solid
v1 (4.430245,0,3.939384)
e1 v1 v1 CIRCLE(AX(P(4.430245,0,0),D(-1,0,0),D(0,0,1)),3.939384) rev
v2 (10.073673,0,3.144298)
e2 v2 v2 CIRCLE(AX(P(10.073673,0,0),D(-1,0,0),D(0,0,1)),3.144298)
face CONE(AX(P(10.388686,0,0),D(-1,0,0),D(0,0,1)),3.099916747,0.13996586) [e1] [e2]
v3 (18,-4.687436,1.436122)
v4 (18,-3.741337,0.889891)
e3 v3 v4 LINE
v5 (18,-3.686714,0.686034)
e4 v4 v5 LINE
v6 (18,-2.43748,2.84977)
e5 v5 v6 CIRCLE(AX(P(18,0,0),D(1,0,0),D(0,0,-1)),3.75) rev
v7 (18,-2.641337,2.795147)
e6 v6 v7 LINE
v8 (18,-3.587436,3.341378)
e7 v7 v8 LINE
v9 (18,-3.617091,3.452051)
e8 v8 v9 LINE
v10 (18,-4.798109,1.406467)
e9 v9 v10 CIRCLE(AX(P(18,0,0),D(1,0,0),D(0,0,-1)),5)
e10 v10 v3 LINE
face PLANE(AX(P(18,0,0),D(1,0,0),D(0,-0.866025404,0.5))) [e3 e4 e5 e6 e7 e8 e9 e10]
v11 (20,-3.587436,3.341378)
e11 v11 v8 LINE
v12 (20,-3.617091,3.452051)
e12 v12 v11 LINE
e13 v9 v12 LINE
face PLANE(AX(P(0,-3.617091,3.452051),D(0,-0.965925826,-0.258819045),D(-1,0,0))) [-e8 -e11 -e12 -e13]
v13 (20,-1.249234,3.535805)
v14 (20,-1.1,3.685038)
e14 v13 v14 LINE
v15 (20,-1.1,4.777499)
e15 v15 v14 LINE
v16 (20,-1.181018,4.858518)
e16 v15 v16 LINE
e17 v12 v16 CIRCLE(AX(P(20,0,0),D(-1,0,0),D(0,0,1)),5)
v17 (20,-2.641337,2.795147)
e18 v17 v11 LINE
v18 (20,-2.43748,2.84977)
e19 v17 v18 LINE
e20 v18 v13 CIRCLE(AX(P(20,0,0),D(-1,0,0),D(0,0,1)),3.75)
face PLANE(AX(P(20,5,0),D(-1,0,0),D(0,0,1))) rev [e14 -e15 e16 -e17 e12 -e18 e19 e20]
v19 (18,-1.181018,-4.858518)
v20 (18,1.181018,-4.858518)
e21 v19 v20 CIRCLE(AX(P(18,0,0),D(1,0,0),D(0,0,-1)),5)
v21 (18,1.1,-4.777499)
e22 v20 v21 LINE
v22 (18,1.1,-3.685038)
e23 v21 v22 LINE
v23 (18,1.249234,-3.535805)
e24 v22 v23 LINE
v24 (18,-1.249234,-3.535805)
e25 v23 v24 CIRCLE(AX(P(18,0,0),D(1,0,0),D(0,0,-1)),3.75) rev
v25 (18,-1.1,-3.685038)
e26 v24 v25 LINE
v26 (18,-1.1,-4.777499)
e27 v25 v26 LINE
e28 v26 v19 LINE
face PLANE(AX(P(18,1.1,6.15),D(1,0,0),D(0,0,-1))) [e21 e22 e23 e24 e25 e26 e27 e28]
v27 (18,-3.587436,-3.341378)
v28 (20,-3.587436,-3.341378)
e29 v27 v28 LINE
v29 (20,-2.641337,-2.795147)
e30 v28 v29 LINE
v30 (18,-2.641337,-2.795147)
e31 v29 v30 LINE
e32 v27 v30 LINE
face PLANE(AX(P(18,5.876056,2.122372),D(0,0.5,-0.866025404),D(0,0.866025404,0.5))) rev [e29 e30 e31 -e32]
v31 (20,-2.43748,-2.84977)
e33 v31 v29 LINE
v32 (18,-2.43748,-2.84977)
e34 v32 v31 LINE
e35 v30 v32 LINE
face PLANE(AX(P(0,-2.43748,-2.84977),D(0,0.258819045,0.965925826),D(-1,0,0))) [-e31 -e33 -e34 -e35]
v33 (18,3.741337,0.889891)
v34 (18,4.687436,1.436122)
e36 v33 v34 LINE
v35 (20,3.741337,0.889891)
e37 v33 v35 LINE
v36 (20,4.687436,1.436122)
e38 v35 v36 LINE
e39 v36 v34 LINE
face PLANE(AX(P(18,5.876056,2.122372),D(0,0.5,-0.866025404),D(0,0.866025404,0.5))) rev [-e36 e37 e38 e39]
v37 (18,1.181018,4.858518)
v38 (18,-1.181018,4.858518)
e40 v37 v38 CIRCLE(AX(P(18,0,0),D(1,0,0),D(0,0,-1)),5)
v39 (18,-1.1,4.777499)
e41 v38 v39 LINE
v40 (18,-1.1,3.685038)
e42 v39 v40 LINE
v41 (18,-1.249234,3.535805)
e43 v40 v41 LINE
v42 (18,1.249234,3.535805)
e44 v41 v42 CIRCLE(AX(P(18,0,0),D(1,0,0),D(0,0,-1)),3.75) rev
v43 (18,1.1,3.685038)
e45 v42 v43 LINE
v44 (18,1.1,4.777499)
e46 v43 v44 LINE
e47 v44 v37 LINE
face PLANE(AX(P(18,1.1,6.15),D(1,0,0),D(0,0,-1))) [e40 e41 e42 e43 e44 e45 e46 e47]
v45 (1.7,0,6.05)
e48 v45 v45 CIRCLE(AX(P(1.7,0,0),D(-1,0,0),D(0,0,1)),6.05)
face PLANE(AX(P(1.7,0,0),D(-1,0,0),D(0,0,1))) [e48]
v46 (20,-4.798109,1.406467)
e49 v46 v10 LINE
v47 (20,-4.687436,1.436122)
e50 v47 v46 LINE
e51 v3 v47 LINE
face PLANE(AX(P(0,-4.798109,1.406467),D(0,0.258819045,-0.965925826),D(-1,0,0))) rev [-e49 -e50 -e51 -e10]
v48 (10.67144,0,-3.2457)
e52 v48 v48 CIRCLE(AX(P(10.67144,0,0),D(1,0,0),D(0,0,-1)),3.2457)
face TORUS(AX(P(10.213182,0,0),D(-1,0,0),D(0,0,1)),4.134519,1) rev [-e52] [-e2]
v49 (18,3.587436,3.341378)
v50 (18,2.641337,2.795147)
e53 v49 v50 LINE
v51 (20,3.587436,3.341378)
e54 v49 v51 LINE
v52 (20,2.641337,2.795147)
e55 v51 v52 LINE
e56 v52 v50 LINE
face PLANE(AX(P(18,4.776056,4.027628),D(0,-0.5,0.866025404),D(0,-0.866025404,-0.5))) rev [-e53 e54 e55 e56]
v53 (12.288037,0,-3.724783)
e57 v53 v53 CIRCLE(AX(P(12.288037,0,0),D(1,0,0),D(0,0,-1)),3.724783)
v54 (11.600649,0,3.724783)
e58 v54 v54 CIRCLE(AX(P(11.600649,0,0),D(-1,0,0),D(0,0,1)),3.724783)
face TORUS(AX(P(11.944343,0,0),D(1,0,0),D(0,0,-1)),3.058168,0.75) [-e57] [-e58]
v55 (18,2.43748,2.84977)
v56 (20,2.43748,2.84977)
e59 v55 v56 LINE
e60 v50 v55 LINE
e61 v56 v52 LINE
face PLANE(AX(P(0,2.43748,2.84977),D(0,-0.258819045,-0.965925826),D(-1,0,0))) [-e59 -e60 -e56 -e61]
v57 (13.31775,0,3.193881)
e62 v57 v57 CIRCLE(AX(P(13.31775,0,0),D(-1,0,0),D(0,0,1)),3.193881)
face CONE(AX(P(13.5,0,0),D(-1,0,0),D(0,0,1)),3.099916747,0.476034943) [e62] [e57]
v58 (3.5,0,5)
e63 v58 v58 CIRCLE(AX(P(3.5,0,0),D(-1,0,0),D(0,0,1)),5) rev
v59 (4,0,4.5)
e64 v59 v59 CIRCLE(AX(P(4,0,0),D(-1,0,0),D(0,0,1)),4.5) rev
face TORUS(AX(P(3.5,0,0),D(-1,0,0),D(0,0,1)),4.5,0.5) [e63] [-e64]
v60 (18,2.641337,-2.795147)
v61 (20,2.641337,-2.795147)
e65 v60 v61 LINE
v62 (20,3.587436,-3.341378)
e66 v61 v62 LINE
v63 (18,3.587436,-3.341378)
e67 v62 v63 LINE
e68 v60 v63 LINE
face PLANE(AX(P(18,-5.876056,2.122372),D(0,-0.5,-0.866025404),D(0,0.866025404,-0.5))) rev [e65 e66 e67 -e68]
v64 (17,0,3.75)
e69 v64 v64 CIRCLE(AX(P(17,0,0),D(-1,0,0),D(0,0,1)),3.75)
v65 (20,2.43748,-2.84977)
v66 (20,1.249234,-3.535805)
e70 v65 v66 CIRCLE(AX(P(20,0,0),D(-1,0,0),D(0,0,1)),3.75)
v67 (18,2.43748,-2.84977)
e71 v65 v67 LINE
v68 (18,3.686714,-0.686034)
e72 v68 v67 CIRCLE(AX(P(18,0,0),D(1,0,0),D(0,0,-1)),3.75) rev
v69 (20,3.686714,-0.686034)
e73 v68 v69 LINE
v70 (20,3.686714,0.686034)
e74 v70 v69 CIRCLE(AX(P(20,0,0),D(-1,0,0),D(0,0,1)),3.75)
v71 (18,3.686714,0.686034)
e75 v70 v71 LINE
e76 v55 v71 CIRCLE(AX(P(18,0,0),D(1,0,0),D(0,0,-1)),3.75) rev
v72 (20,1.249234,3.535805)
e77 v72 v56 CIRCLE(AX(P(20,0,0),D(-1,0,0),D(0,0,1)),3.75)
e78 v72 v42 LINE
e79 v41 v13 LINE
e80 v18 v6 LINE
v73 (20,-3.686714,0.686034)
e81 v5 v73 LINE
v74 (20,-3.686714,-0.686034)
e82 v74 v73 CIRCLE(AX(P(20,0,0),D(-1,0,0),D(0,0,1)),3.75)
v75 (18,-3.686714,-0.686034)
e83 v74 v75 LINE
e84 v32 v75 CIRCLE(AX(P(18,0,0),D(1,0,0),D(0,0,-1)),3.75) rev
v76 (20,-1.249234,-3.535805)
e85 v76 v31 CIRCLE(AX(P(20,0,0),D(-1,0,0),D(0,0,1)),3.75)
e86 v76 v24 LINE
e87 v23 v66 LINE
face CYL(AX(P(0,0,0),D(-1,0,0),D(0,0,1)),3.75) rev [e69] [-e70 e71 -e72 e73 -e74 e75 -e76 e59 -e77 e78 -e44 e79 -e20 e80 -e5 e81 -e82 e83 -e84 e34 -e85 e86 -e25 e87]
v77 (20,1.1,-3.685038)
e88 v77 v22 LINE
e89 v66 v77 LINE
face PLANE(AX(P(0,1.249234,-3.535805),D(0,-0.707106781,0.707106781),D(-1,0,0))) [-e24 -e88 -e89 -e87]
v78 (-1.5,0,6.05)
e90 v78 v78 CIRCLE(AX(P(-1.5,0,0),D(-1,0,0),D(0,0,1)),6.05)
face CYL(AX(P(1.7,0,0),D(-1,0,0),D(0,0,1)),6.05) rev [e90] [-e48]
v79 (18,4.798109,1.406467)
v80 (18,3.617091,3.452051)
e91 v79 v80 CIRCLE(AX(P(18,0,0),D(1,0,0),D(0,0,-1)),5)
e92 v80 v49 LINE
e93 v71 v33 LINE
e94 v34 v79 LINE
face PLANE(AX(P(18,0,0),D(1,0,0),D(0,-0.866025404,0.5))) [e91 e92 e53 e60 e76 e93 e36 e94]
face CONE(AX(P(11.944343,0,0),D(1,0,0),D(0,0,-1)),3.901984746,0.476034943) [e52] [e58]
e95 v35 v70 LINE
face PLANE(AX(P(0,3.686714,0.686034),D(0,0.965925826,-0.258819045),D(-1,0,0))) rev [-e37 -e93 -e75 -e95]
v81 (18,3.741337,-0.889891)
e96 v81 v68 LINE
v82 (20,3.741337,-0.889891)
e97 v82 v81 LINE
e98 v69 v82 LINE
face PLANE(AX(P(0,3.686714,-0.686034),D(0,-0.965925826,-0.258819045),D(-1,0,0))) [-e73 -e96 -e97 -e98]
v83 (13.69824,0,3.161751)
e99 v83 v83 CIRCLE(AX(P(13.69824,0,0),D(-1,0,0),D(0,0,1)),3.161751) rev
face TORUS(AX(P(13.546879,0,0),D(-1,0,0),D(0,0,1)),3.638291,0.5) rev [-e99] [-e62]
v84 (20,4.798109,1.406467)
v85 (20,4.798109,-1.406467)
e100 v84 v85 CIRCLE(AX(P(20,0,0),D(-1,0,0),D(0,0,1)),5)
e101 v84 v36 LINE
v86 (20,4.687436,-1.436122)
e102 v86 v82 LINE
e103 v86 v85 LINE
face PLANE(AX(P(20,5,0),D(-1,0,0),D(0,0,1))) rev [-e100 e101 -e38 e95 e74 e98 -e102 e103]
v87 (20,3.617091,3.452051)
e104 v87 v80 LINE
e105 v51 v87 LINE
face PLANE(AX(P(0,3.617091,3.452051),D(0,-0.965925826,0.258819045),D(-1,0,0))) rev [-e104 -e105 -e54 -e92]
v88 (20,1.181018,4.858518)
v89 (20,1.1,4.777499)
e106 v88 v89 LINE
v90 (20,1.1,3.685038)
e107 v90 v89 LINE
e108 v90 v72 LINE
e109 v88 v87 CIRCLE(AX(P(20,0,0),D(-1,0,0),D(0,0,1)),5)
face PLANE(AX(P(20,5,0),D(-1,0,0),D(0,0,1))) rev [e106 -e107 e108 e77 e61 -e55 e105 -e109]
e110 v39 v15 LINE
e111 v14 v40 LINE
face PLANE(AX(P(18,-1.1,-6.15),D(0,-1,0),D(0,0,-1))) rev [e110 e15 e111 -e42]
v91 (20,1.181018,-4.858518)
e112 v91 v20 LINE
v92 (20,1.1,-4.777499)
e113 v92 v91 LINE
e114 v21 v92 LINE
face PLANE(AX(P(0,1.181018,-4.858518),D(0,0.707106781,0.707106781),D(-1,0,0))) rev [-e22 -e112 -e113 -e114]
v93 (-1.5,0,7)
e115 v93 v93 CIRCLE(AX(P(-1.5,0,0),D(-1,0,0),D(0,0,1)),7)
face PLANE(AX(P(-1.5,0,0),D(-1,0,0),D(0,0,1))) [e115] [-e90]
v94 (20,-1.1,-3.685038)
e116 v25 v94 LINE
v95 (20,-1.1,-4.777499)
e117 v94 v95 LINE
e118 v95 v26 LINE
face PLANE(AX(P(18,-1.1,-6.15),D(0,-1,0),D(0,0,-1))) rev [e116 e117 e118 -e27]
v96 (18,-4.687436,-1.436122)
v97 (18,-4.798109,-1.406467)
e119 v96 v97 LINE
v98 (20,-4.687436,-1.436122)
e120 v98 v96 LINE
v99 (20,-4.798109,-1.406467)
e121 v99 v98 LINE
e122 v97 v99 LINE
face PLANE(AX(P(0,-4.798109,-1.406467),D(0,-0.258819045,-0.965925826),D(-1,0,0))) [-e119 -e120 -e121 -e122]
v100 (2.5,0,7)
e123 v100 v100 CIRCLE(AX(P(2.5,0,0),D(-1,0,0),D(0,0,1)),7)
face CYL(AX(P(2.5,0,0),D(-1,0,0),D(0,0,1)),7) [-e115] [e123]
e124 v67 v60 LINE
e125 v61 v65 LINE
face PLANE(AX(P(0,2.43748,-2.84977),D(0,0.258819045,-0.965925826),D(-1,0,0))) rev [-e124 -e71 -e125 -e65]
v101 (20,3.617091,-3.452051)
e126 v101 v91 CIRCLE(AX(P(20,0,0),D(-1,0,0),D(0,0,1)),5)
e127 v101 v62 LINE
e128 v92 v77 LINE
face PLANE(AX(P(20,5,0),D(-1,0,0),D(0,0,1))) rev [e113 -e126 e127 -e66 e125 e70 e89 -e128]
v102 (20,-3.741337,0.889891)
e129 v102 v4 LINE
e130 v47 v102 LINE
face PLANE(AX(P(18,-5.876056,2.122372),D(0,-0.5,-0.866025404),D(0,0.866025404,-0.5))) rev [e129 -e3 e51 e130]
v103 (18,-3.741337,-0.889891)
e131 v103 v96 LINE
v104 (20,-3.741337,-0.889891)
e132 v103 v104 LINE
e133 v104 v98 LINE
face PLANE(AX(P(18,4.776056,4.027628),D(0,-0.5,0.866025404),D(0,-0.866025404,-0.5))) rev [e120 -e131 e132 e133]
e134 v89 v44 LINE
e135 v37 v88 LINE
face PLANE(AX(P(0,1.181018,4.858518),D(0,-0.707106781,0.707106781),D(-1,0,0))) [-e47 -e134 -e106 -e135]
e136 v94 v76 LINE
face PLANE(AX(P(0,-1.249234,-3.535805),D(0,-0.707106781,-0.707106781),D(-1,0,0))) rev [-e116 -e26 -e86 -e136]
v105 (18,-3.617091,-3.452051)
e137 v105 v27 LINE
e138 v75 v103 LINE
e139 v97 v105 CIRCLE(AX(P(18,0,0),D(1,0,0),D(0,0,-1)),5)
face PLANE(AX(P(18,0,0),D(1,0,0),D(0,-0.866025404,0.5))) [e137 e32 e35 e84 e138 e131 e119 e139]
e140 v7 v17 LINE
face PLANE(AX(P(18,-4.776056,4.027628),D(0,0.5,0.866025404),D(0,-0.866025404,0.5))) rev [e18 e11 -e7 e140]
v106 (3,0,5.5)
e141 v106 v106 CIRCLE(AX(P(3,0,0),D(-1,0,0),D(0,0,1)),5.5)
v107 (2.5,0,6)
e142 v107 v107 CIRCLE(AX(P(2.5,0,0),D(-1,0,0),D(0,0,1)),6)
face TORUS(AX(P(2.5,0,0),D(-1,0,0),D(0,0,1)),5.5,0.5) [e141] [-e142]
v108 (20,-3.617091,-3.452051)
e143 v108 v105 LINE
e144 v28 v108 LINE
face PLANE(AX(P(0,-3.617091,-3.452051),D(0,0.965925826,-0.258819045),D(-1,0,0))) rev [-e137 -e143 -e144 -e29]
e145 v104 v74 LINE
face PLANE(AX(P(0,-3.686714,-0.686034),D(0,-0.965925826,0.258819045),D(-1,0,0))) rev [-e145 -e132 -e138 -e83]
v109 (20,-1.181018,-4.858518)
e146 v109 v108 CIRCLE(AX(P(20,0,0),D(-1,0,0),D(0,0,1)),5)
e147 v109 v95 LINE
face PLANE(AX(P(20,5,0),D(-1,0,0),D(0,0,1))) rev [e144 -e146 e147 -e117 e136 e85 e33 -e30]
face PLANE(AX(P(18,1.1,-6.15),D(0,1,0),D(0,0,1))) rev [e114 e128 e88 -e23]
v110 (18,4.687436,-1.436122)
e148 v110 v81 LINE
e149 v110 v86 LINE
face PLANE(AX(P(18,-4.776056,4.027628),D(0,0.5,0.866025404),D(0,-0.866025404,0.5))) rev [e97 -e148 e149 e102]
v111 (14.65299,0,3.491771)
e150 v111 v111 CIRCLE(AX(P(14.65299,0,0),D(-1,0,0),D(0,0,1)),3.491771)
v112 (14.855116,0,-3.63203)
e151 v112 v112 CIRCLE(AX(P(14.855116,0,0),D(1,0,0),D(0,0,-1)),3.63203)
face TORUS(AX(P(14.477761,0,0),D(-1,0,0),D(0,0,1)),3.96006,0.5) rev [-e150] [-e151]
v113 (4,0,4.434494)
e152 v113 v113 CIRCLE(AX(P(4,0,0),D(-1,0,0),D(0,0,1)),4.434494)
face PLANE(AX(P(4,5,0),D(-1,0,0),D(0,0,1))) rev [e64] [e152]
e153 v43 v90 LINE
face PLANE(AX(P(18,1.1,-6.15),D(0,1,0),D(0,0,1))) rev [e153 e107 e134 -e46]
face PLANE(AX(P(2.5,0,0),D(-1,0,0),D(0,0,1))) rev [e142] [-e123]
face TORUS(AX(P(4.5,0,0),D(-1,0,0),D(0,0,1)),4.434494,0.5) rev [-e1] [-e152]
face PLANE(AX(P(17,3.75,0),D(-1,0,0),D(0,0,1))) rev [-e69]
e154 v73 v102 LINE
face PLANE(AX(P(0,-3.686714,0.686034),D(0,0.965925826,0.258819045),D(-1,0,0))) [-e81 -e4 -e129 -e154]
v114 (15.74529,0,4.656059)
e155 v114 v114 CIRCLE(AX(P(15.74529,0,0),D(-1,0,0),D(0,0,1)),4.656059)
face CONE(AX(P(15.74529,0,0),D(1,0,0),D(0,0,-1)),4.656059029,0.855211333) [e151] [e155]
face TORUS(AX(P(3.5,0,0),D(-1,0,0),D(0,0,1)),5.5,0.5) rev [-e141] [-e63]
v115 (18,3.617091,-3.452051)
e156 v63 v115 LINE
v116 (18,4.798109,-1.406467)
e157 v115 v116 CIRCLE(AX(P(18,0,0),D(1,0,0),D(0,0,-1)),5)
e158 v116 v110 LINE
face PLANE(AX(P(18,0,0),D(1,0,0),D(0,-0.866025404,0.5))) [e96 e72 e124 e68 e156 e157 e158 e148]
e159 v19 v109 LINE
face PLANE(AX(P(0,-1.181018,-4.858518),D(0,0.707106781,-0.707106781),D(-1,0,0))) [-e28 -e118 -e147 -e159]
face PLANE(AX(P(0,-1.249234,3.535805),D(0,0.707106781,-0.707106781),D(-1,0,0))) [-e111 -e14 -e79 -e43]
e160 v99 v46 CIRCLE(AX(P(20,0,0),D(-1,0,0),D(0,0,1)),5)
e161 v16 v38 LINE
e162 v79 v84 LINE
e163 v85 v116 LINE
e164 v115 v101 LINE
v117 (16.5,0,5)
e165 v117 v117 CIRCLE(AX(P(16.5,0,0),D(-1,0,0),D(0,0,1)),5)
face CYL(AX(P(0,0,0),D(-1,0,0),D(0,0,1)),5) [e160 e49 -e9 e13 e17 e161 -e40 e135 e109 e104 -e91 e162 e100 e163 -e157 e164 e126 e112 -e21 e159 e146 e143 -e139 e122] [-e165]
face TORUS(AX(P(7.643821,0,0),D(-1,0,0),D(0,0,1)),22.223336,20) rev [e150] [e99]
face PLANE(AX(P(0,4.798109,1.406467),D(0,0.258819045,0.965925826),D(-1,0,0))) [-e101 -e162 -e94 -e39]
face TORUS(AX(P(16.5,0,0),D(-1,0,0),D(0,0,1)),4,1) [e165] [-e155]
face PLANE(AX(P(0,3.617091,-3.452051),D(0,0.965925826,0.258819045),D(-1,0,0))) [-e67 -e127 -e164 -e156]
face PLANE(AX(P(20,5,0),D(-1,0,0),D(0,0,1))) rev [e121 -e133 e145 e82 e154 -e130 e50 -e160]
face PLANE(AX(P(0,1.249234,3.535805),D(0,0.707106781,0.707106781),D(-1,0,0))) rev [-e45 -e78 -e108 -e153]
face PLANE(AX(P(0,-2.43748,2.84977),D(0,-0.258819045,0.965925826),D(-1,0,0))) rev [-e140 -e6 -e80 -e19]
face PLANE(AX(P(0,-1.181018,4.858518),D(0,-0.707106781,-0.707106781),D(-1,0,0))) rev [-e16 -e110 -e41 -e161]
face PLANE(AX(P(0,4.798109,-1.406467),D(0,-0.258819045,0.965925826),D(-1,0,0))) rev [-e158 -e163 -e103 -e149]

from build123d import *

# Parameters (mm, degrees)
ESBO_O2_W             = 12.3
ESBO_O2_H             = 2.2
CORTE_EXTRUS_O1_DEPTH = 2
FILETE3_R             = 0.5
FILETE4_R             = 0.5
CHANFRO1_SIZE         = 0.35
FILETE5_R             = 0.75
PADR_OCIRCULAR1_COUNT = 3
FILETE6_R             = 1
CHANFRO2_SIZE         = 0.1
SKETCH1_R             = 7
BOSS_EXTRUDE1_DEPTH   = 2.5
BOSS_EXTRUDE2_START   = 1.5
SKETCH1_2_R           = 7
BOSS_EXTRUDE2_DEPTH   = 1.5
SKETCH3_R             = 6.05
CUT_EXTRUDE1_DEPTH    = 3.2


# Some blends are built 0.0001 mm under size
with BuildPart() as part:
    # Esboço1 → Revolução1 (revolve)
    with BuildSketch(Plane.XY, mode=Mode.PRIVATE) as revolu_o1_sk:
        with BuildLine():
            Line((3, 5), (4, 5))
            Line((4, 5), (4, 4))
            Line((4, 4), (10.388685706, 3.099916747))
            Line((10.388685706, 3.099916747), (11.944342853, 3.901984746))
            Line((11.944342853, 3.901984746), (13.5, 3.099916747))
            ThreePointArc((13.5, 3.099916747), (14.139882416, 3.307702721), (14.772414141, 3.536892893))
            Line((14.772414141, 3.536892893), (15.74529042, 4.656059029))
            ThreePointArc((15.74529042, 4.656059029), (16.085306757, 4.909961271), (16.5, 5))
            Line((16.5, 5), (20, 5))
            Line((20, 5), (20, 3.75))
            Line((20, 3.75), (17, 3.75))
            Line((17, 3.75), (17, 0))
            Line((17, 0), (0, 0))
            Line((0, 0), (0, 6))
            Line((0, 6), (3, 6))
            Line((3, 6), (3, 5))
        make_face()
    revolve(revolu_o1_sk.sketch.rotate(Axis((0, 0, 0), (1, 0, 0)), 90), axis=Axis((0, 0, 0), (1, 0, 0)))

    # Esboço2 → Corte-extrusão1 (cut)
    with BuildSketch(Plane(origin=(20, 0, 0), x_dir=(0, 0, -1), z_dir=(1, 0, 0))):
        Rectangle(ESBO_O2_W, ESBO_O2_H)
    corte_extrus_o1 = extrude(amount=-CORTE_EXTRUS_O1_DEPTH, mode=Mode.SUBTRACT)

    # Filete3
    filete3_edges = [part.edges().sort_by_distance(p)[0] for p in [
        (3, 0, -5),
        (4, 0, -4),
        (13.5, 0, -3.099916747),
        (14.772414141, 0, -3.536892893),
    ]]
    fillet(filete3_edges, radius=FILETE3_R)

    # Filete4
    filete4_edges = [part.edges().sort_by_distance(p)[0] for p in [
        (3, 0, -6),
        (4, 0, -5),
    ]]
    fillet(filete4_edges, radius=FILETE4_R - 0.0001)  # a hair under: the kernel refuses the full size

    # Chanfro1
    chanfro1_edges = [part.edges().sort_by_distance(p)[0] for p in [
        (0, 0, -6),
    ]]
    chamfer(chanfro1_edges, length=CHANFRO1_SIZE)

    # Filete5
    filete5_edges = [part.edges().sort_by_distance(p)[0] for p in [
        (11.944342853, 0, -3.901984746),
    ]]
    fillet(filete5_edges, radius=FILETE5_R)

    # PadrãoCircular1: Corte-extrusão1 ×3 about axis
    padr_ocircular1_axis = Axis((0, 0, 0), (1, 0, 0))
    for i in range(1, PADR_OCIRCULAR1_COUNT):
        add(corte_extrus_o1.rotate(padr_ocircular1_axis, i * 360 / PADR_OCIRCULAR1_COUNT), mode=Mode.SUBTRACT)

    # Filete6
    filete6_edges = [part.edges().sort_by_distance(p)[0] for p in [
        (10.388685706, 0, -3.099916747),
    ]]
    fillet(filete6_edges, radius=FILETE6_R)

    # Chanfro2
    # the kernel refuses this chamfer: 0.150903104, 0.1, 0.083647019 mm, written as the material it takes off along each edge
    with BuildSketch(Plane(origin=(18, -3.674038352, 3.391377624), x_dir=(0, 0.6843665463498617, 0.7291381420808835), z_dir=(1, 0, 0)), Plane(origin=(18, 3.674038352, -3.391377624), x_dir=(0, -0.6843665463498592, -0.7291381420808858), z_dir=(1, 0, 0)), Plane(origin=(18, -1.1, -4.877499359), x_dir=(0, -0.9736354270851664, 0.2281097435987456), z_dir=(1, 0, 0)), Plane(origin=(18, 1.1, 4.877499359), x_dir=(0, 0.9736354270851673, -0.22810974359874206), z_dir=(1, 0, 0)), Plane(origin=(18, -4.774038352, -1.486121735), x_dir=(0, -0.2892688807353101, 0.95724788567964), z_dir=(1, 0, 0)), Plane(origin=(18, 4.774038352, 1.486121735), x_dir=(0, 0.28926888073530843, -0.9572478856796405), z_dir=(1, 0, 0))) as chanfro2_piece_1:
        with BuildLine():
            Line((0.083212317, 0), (CHANFRO2_SIZE * 0.228109743599, -CHANFRO2_SIZE * 0.973635427085))
            Line((CHANFRO2_SIZE * 0.228109743599, -CHANFRO2_SIZE * 0.973635427085), (0, 0))
            ThreePointArc((0, 0), (0.042660169, 0.000172999), (0.083212317, 0))
        make_face()
    extrude(amount=2.257168299, mode=Mode.SUBTRACT)
    with BuildSketch(Plane(origin=(18, -4.774038352, 1.486121735), x_dir=(0, -0.28926888073530255, -0.9572478856796423), z_dir=(1, 0, 0)), Plane(origin=(18, 4.774038352, -1.486121735), x_dir=(0, 0.28926888073529794, 0.9572478856796437), z_dir=(1, 0, 0)), Plane(origin=(18, 1.1, -4.877499359), x_dir=(0, 0.9736354270851638, 0.22810974359875694), z_dir=(1, 0, 0)), Plane(origin=(18, -1.1, 4.877499359), x_dir=(0, -0.9736354270851638, -0.22810974359875694), z_dir=(1, 0, 0)), Plane(origin=(18, -3.674038352, -3.391377624), x_dir=(0, 0.684366546349859, -0.7291381420808859), z_dir=(1, 0, 0)), Plane(origin=(18, 3.674038352, 3.391377624), x_dir=(0, -0.6843665463498564, 0.7291381420808885), z_dir=(1, 0, 0))) as chanfro2_piece_2:
        with BuildLine():
            Line((0.083212317, 0), (CHANFRO2_SIZE * 0.228109743599, CHANFRO2_SIZE * 0.973635427085))
            Line((CHANFRO2_SIZE * 0.228109743599, CHANFRO2_SIZE * 0.973635427085), (0, 0))
            ThreePointArc((0, 0), (0.042660169, -0.000172999), (0.083212317, 0))
        make_face()
    extrude(amount=2.257168299, mode=Mode.SUBTRACT)
    with BuildSketch(Plane(origin=(20.406395934, -3.654734288, 0.839891233), x_dir=(0, -0.8660254037844374, 0.5000000000000021), z_dir=(-1, 0, 0)), Plane(origin=(20.406395934, 3.654734288, -0.839891233), x_dir=(0, 0.8660254037844374, -0.5000000000000021), z_dir=(-1, 0, 0)), Plane(origin=(20.406395934, 2.554734288, 2.745147121), x_dir=(0, 0.8660254037844372, 0.5000000000000027), z_dir=(-1, 0, 0)), Plane(origin=(20.406395934, -2.554734288, -2.745147121), x_dir=(0, -0.8660254037844384, -0.5000000000000008), z_dir=(-1, 0, 0)), Plane(origin=(20.406395934, 1.1, -3.585038354), x_dir=(0, 0, -1), z_dir=(-1, 0, 0)), Plane(origin=(20.406395934, -1.1, 3.585038354), x_dir=(0, 0, 1), z_dir=(-1, 0, 0))) as chanfro2_piece_3:
        with BuildLine():
            Line((CHANFRO2_SIZE, 0), (-0.049233566, -0.149233566))
            ThreePointArc((-0.049233566, -0.149233566), (-0.024680823, -0.077435456), (0, 0))
            Line((0, 0), (CHANFRO2_SIZE, 0))
        make_face()
    extrude(amount=2.406395934, mode=Mode.SUBTRACT)
    with BuildSketch(Plane(origin=(20.406395934, -2.554734288, 2.745147121), x_dir=(0, -0.8660254037844393, 0.4999999999999987), z_dir=(-1, 0, 0)), Plane(origin=(20.406395934, 2.554734288, -2.745147121), x_dir=(0, 0.8660254037844384, -0.5000000000000008), z_dir=(-1, 0, 0)), Plane(origin=(20.406395934, 3.654734288, 0.839891233), x_dir=(0, 0.8660254037844396, 0.4999999999999983), z_dir=(-1, 0, 0)), Plane(origin=(20.406395934, -3.654734288, -0.839891233), x_dir=(0, -0.8660254037844387, -0.49999999999999983), z_dir=(-1, 0, 0)), Plane(origin=(20.406395934, 1.1, 3.585038354), x_dir=(0, 0, 1), z_dir=(-1, 0, 0)), Plane(origin=(20.406395934, -1.1, -3.585038354), x_dir=(0, 0, -1), z_dir=(-1, 0, 0))) as chanfro2_piece_4:
        with BuildLine():
            Line((CHANFRO2_SIZE, 0), (-0.049233566, 0.149233566))
            ThreePointArc((-0.049233566, 0.149233566), (-0.024680823, 0.077435456), (0, 0))
            Line((0, 0), (CHANFRO2_SIZE, 0))
        make_face()
    extrude(amount=2.406395934, mode=Mode.SUBTRACT)

    # Sketch1 → Boss-Extrude1 (add)
    with BuildSketch(Plane.ZY):
        Circle(SKETCH1_R)
    extrude(amount=-BOSS_EXTRUDE1_DEPTH)

    # Sketch1<2> → Boss-Extrude2 (add)
    with BuildSketch(Plane.ZY.offset(BOSS_EXTRUDE2_START)):
        Circle(SKETCH1_2_R)
    extrude(amount=-BOSS_EXTRUDE2_DEPTH)

    # Sketch3 → Cut-Extrude1 (cut)
    with BuildSketch(Plane.ZY.offset(1.5)):
        Circle(SKETCH3_R)
    extrude(amount=-CUT_EXTRUDE1_DEPTH, mode=Mode.SUBTRACT)


solid = part.part
